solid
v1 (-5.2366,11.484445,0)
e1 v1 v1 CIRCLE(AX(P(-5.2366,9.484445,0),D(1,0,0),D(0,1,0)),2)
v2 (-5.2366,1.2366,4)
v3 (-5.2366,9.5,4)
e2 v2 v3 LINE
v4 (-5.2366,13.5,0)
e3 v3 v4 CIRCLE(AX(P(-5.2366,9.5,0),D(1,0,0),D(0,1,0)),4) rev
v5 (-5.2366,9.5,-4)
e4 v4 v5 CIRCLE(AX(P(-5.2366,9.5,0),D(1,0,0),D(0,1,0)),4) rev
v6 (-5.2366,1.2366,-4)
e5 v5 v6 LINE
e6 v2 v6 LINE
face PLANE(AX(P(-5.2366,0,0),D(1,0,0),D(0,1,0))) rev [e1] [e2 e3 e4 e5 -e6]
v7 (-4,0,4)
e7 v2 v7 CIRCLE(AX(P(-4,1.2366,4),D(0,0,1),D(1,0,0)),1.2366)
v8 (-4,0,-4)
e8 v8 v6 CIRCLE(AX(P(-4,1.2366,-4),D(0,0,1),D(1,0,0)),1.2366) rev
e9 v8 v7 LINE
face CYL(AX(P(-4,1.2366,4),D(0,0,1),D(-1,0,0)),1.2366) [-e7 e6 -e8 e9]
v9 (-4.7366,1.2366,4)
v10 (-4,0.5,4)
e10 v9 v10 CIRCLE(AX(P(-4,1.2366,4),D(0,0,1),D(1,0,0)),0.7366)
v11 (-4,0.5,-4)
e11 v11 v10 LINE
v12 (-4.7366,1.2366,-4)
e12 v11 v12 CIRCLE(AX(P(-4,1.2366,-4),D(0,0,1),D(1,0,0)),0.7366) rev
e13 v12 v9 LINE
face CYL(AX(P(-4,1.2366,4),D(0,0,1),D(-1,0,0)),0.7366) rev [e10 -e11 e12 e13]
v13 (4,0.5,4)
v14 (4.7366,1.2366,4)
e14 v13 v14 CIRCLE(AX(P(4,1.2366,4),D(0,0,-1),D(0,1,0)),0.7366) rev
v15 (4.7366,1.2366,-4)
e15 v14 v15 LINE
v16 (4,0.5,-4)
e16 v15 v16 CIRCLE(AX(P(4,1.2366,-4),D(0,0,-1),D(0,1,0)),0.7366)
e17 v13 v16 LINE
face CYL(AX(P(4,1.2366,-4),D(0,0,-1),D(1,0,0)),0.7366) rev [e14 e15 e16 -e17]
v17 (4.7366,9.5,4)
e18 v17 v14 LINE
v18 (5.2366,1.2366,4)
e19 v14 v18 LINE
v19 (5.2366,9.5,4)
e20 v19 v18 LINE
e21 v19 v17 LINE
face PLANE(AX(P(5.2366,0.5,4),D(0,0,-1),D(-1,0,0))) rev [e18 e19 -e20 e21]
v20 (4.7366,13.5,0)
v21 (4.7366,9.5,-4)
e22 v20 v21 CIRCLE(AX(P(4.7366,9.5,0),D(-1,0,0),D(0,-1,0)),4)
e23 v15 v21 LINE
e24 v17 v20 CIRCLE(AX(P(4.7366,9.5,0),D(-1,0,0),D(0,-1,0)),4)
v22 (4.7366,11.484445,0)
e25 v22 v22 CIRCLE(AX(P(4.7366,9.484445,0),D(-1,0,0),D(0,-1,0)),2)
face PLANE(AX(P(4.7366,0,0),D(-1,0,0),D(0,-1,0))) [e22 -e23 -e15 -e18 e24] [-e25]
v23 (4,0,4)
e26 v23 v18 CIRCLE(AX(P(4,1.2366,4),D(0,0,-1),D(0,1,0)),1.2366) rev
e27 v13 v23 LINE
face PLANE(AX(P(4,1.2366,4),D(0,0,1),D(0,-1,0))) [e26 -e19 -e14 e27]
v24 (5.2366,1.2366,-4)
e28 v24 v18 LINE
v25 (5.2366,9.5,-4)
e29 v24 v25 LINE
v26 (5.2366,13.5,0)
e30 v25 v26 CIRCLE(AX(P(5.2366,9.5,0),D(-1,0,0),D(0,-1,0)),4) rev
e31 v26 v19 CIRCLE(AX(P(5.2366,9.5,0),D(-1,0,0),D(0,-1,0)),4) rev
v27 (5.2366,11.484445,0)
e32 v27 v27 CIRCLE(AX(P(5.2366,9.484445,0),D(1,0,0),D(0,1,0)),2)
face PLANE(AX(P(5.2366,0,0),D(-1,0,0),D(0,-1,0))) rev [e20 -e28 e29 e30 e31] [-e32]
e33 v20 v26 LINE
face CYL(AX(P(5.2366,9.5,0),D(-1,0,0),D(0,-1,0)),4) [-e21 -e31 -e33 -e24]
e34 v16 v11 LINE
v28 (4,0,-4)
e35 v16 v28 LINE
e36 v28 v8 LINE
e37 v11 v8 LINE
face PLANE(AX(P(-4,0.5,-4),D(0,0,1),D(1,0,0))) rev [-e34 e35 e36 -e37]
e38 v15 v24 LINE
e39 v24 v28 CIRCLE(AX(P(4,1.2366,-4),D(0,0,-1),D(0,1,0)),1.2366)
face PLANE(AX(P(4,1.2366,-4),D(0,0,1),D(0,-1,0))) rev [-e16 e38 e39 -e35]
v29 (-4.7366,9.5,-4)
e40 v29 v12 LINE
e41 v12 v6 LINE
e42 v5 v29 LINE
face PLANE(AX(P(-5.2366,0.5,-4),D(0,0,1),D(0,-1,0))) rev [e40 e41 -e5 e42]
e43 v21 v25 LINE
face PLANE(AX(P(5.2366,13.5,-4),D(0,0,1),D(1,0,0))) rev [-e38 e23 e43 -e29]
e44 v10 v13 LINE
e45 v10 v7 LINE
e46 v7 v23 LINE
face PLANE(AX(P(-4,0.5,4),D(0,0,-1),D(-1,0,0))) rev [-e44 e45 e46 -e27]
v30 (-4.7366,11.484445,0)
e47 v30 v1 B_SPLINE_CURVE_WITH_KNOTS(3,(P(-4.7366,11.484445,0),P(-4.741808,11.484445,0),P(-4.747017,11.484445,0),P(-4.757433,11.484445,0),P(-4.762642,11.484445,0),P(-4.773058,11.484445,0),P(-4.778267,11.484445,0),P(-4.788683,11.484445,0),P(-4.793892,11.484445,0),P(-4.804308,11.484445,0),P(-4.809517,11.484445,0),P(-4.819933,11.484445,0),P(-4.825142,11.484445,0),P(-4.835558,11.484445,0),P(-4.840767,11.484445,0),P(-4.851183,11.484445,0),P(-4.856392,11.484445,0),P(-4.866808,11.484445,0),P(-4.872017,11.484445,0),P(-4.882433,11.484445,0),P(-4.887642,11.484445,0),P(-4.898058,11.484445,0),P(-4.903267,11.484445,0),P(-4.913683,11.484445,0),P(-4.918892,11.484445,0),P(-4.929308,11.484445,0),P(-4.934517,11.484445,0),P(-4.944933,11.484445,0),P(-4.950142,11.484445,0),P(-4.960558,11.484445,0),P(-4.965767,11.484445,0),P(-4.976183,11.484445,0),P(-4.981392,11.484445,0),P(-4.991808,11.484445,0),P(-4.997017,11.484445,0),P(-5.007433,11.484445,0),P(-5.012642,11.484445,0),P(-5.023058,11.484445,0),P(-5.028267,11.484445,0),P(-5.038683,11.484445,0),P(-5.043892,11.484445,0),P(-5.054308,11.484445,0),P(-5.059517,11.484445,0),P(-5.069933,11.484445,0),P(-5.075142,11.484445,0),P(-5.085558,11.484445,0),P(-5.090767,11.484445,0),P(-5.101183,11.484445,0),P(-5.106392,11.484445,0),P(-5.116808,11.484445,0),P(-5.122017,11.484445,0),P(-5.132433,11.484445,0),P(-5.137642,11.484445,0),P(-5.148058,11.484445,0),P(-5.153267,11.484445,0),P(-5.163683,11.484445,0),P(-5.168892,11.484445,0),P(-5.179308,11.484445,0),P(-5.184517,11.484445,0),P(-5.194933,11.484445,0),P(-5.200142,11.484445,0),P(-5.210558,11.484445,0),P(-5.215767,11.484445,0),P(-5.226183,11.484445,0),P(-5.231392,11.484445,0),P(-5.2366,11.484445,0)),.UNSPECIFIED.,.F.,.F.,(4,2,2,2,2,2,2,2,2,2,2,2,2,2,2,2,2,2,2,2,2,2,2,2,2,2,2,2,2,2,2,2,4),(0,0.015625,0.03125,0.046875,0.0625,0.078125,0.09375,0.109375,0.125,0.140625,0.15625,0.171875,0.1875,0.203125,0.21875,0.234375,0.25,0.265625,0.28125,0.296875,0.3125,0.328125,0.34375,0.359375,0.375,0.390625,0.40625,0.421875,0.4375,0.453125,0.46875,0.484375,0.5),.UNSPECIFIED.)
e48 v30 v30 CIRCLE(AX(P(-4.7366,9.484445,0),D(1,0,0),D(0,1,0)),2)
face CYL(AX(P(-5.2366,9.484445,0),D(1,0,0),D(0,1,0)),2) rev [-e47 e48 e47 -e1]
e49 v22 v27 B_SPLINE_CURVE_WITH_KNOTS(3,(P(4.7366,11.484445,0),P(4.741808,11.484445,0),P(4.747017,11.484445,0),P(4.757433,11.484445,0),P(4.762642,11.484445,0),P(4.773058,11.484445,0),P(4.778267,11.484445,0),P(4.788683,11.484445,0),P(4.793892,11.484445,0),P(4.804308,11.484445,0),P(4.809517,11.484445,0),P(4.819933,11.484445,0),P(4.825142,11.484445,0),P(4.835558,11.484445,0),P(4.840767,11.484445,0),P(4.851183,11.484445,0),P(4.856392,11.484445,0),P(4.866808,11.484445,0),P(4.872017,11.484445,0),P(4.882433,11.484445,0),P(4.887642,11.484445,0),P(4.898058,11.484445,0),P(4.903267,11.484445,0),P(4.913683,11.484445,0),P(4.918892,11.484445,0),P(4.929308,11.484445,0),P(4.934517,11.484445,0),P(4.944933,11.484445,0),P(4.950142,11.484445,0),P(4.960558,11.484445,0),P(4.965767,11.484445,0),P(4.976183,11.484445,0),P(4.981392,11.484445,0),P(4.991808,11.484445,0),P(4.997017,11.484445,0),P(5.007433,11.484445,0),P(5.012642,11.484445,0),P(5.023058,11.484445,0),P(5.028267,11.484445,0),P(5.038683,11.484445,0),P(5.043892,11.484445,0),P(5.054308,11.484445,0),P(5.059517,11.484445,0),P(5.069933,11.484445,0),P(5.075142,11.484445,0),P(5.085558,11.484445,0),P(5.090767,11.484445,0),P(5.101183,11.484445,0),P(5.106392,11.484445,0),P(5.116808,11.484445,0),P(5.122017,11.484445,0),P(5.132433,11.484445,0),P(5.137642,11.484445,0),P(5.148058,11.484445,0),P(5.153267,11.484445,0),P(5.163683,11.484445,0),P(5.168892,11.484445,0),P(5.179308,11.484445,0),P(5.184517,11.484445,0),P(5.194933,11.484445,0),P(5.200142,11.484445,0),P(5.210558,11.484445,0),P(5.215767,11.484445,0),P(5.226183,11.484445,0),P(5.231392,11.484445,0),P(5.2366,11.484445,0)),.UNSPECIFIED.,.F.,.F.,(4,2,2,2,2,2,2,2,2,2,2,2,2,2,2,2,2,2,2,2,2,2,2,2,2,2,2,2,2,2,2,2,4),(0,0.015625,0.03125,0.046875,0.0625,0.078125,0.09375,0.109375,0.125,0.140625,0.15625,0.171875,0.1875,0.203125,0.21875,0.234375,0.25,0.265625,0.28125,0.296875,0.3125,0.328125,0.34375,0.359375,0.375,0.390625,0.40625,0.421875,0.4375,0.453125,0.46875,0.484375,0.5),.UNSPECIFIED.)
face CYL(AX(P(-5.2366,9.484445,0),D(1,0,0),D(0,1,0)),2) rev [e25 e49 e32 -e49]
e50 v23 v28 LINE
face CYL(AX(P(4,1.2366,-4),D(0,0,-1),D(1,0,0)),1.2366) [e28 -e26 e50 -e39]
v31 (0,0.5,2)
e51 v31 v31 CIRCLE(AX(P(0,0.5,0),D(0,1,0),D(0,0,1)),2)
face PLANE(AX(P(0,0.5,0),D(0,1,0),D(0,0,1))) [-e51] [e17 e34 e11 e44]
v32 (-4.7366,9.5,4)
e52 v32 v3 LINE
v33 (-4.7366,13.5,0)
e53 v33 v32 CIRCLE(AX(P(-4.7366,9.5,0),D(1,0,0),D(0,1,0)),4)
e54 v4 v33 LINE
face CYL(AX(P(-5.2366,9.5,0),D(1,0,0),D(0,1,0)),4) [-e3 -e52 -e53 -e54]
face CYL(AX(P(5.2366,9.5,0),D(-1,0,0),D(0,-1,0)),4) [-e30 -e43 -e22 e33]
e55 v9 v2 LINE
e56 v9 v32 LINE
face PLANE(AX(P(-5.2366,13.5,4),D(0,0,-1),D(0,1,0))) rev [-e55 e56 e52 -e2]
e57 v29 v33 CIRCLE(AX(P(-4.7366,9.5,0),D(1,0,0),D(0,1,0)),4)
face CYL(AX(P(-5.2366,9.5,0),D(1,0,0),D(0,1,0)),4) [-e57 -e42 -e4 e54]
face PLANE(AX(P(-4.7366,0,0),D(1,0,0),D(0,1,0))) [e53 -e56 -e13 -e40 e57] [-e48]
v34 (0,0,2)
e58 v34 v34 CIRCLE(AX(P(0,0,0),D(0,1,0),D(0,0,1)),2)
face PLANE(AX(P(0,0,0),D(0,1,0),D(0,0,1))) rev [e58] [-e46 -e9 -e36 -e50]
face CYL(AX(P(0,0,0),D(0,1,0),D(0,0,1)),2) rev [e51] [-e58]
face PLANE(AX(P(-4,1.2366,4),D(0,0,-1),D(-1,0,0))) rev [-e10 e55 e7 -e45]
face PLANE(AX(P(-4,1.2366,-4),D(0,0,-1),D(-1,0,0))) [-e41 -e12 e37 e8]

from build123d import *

# Parameters (mm, degrees)
SKETCH1_W          = 8
SKETCH1_H          = 8
BASE_FLANGE1_DEPTH = 0.5
EDGE_FLANGE1_DEPTH = 8
EDGE_FLANGE2_DEPTH = 8
FILLET1_R          = 4
SKETCH12_R         = 2
CUT_EXTRUDE1_DEPTH = 15.574703412
SKETCH13_R         = 2
CUT_EXTRUDE2_DEPTH = 18.548159967


# Sheet-metal steps are written as plain solids
with BuildPart() as part:
    # Sketch1 → Base-Flange1 (new body)
    with BuildSketch(Plane(origin=(0, 0, 0), x_dir=(1, 0, 0), z_dir=(0, 1, 0))):
        Rectangle(SKETCH1_W, SKETCH1_H)
    extrude(amount=BASE_FLANGE1_DEPTH)

    # Edge-Flange1 section (across the edge) → Edge-Flange1 (add)
    with BuildSketch(Plane(origin=(4.7366, 0.5, 4), x_dir=(-1, 0, 0), z_dir=(0, 0, -1))):
        with BuildLine():
            Line((-0.5, 0.7366), (-0.5, 13))
            Line((-0.5, 13), (0, 13))
            Line((0, 13), (0, 0.7366))
            ThreePointArc((0, 0.7366), (0.215745145, 0.215745145), (0.7366, 0))
            Line((0.7366, 0), (0.7366, -0.5))
            ThreePointArc((0.7366, -0.5), (-0.137808246, -0.137808246), (-0.5, 0.7366))
        make_face()
    extrude(amount=EDGE_FLANGE1_DEPTH)

    # Edge-Flange2 section (across the edge) → Edge-Flange2 (add)
    with BuildSketch(Plane(origin=(-4.7366, 0.5, -4), x_dir=(1, 0, 0), z_dir=(0, 0, 1))):
        with BuildLine():
            Line((-0.5, 0.7366), (-0.5, 13))
            Line((-0.5, 13), (0, 13))
            Line((0, 13), (0, 0.7366))
            ThreePointArc((0, 0.7366), (0.215745145, 0.215745145), (0.7366, 0))
            Line((0.7366, 0), (0.7366, -0.5))
            ThreePointArc((0.7366, -0.5), (-0.137808246, -0.137808246), (-0.5, 0.7366))
        make_face()
    extrude(amount=EDGE_FLANGE2_DEPTH)

    # Fillet1
    fillet1_edges = [part.edges().sort_by_distance(p)[0] for p in [
        (4.9866, 13.5, -4),
        (-4.9866, 13.5, -4),
        (4.9866, 13.5, 4),
        (-4.9866, 13.5, 4),
    ]]
    fillet(fillet1_edges, radius=FILLET1_R - 0.0001)  # a hair under: the kernel refuses the full size

    # Sketch12 → Cut-Extrude1 (cut, through all)
    with BuildSketch(Plane(origin=(0, 0.5, 0), x_dir=(1, 0, 0), z_dir=(0, 1, 0))):
        with Locations(Location((0, 0, 0), (0, 0, 270))):
            Circle(SKETCH12_R)
    extrude(amount=-CUT_EXTRUDE1_DEPTH, mode=Mode.SUBTRACT)

    # Sketch13 → Cut-Extrude2 (cut, through all)
    with BuildSketch(Plane(origin=(5.2366, 0, 0), x_dir=(0, 0, -1), z_dir=(1, 0, 0))):
        with Locations(Location((0, 9.484444929, 0), (0, 0, 90))):
            Circle(SKETCH13_R)
    extrude(amount=-CUT_EXTRUDE2_DEPTH, mode=Mode.SUBTRACT)


solid = part.part
